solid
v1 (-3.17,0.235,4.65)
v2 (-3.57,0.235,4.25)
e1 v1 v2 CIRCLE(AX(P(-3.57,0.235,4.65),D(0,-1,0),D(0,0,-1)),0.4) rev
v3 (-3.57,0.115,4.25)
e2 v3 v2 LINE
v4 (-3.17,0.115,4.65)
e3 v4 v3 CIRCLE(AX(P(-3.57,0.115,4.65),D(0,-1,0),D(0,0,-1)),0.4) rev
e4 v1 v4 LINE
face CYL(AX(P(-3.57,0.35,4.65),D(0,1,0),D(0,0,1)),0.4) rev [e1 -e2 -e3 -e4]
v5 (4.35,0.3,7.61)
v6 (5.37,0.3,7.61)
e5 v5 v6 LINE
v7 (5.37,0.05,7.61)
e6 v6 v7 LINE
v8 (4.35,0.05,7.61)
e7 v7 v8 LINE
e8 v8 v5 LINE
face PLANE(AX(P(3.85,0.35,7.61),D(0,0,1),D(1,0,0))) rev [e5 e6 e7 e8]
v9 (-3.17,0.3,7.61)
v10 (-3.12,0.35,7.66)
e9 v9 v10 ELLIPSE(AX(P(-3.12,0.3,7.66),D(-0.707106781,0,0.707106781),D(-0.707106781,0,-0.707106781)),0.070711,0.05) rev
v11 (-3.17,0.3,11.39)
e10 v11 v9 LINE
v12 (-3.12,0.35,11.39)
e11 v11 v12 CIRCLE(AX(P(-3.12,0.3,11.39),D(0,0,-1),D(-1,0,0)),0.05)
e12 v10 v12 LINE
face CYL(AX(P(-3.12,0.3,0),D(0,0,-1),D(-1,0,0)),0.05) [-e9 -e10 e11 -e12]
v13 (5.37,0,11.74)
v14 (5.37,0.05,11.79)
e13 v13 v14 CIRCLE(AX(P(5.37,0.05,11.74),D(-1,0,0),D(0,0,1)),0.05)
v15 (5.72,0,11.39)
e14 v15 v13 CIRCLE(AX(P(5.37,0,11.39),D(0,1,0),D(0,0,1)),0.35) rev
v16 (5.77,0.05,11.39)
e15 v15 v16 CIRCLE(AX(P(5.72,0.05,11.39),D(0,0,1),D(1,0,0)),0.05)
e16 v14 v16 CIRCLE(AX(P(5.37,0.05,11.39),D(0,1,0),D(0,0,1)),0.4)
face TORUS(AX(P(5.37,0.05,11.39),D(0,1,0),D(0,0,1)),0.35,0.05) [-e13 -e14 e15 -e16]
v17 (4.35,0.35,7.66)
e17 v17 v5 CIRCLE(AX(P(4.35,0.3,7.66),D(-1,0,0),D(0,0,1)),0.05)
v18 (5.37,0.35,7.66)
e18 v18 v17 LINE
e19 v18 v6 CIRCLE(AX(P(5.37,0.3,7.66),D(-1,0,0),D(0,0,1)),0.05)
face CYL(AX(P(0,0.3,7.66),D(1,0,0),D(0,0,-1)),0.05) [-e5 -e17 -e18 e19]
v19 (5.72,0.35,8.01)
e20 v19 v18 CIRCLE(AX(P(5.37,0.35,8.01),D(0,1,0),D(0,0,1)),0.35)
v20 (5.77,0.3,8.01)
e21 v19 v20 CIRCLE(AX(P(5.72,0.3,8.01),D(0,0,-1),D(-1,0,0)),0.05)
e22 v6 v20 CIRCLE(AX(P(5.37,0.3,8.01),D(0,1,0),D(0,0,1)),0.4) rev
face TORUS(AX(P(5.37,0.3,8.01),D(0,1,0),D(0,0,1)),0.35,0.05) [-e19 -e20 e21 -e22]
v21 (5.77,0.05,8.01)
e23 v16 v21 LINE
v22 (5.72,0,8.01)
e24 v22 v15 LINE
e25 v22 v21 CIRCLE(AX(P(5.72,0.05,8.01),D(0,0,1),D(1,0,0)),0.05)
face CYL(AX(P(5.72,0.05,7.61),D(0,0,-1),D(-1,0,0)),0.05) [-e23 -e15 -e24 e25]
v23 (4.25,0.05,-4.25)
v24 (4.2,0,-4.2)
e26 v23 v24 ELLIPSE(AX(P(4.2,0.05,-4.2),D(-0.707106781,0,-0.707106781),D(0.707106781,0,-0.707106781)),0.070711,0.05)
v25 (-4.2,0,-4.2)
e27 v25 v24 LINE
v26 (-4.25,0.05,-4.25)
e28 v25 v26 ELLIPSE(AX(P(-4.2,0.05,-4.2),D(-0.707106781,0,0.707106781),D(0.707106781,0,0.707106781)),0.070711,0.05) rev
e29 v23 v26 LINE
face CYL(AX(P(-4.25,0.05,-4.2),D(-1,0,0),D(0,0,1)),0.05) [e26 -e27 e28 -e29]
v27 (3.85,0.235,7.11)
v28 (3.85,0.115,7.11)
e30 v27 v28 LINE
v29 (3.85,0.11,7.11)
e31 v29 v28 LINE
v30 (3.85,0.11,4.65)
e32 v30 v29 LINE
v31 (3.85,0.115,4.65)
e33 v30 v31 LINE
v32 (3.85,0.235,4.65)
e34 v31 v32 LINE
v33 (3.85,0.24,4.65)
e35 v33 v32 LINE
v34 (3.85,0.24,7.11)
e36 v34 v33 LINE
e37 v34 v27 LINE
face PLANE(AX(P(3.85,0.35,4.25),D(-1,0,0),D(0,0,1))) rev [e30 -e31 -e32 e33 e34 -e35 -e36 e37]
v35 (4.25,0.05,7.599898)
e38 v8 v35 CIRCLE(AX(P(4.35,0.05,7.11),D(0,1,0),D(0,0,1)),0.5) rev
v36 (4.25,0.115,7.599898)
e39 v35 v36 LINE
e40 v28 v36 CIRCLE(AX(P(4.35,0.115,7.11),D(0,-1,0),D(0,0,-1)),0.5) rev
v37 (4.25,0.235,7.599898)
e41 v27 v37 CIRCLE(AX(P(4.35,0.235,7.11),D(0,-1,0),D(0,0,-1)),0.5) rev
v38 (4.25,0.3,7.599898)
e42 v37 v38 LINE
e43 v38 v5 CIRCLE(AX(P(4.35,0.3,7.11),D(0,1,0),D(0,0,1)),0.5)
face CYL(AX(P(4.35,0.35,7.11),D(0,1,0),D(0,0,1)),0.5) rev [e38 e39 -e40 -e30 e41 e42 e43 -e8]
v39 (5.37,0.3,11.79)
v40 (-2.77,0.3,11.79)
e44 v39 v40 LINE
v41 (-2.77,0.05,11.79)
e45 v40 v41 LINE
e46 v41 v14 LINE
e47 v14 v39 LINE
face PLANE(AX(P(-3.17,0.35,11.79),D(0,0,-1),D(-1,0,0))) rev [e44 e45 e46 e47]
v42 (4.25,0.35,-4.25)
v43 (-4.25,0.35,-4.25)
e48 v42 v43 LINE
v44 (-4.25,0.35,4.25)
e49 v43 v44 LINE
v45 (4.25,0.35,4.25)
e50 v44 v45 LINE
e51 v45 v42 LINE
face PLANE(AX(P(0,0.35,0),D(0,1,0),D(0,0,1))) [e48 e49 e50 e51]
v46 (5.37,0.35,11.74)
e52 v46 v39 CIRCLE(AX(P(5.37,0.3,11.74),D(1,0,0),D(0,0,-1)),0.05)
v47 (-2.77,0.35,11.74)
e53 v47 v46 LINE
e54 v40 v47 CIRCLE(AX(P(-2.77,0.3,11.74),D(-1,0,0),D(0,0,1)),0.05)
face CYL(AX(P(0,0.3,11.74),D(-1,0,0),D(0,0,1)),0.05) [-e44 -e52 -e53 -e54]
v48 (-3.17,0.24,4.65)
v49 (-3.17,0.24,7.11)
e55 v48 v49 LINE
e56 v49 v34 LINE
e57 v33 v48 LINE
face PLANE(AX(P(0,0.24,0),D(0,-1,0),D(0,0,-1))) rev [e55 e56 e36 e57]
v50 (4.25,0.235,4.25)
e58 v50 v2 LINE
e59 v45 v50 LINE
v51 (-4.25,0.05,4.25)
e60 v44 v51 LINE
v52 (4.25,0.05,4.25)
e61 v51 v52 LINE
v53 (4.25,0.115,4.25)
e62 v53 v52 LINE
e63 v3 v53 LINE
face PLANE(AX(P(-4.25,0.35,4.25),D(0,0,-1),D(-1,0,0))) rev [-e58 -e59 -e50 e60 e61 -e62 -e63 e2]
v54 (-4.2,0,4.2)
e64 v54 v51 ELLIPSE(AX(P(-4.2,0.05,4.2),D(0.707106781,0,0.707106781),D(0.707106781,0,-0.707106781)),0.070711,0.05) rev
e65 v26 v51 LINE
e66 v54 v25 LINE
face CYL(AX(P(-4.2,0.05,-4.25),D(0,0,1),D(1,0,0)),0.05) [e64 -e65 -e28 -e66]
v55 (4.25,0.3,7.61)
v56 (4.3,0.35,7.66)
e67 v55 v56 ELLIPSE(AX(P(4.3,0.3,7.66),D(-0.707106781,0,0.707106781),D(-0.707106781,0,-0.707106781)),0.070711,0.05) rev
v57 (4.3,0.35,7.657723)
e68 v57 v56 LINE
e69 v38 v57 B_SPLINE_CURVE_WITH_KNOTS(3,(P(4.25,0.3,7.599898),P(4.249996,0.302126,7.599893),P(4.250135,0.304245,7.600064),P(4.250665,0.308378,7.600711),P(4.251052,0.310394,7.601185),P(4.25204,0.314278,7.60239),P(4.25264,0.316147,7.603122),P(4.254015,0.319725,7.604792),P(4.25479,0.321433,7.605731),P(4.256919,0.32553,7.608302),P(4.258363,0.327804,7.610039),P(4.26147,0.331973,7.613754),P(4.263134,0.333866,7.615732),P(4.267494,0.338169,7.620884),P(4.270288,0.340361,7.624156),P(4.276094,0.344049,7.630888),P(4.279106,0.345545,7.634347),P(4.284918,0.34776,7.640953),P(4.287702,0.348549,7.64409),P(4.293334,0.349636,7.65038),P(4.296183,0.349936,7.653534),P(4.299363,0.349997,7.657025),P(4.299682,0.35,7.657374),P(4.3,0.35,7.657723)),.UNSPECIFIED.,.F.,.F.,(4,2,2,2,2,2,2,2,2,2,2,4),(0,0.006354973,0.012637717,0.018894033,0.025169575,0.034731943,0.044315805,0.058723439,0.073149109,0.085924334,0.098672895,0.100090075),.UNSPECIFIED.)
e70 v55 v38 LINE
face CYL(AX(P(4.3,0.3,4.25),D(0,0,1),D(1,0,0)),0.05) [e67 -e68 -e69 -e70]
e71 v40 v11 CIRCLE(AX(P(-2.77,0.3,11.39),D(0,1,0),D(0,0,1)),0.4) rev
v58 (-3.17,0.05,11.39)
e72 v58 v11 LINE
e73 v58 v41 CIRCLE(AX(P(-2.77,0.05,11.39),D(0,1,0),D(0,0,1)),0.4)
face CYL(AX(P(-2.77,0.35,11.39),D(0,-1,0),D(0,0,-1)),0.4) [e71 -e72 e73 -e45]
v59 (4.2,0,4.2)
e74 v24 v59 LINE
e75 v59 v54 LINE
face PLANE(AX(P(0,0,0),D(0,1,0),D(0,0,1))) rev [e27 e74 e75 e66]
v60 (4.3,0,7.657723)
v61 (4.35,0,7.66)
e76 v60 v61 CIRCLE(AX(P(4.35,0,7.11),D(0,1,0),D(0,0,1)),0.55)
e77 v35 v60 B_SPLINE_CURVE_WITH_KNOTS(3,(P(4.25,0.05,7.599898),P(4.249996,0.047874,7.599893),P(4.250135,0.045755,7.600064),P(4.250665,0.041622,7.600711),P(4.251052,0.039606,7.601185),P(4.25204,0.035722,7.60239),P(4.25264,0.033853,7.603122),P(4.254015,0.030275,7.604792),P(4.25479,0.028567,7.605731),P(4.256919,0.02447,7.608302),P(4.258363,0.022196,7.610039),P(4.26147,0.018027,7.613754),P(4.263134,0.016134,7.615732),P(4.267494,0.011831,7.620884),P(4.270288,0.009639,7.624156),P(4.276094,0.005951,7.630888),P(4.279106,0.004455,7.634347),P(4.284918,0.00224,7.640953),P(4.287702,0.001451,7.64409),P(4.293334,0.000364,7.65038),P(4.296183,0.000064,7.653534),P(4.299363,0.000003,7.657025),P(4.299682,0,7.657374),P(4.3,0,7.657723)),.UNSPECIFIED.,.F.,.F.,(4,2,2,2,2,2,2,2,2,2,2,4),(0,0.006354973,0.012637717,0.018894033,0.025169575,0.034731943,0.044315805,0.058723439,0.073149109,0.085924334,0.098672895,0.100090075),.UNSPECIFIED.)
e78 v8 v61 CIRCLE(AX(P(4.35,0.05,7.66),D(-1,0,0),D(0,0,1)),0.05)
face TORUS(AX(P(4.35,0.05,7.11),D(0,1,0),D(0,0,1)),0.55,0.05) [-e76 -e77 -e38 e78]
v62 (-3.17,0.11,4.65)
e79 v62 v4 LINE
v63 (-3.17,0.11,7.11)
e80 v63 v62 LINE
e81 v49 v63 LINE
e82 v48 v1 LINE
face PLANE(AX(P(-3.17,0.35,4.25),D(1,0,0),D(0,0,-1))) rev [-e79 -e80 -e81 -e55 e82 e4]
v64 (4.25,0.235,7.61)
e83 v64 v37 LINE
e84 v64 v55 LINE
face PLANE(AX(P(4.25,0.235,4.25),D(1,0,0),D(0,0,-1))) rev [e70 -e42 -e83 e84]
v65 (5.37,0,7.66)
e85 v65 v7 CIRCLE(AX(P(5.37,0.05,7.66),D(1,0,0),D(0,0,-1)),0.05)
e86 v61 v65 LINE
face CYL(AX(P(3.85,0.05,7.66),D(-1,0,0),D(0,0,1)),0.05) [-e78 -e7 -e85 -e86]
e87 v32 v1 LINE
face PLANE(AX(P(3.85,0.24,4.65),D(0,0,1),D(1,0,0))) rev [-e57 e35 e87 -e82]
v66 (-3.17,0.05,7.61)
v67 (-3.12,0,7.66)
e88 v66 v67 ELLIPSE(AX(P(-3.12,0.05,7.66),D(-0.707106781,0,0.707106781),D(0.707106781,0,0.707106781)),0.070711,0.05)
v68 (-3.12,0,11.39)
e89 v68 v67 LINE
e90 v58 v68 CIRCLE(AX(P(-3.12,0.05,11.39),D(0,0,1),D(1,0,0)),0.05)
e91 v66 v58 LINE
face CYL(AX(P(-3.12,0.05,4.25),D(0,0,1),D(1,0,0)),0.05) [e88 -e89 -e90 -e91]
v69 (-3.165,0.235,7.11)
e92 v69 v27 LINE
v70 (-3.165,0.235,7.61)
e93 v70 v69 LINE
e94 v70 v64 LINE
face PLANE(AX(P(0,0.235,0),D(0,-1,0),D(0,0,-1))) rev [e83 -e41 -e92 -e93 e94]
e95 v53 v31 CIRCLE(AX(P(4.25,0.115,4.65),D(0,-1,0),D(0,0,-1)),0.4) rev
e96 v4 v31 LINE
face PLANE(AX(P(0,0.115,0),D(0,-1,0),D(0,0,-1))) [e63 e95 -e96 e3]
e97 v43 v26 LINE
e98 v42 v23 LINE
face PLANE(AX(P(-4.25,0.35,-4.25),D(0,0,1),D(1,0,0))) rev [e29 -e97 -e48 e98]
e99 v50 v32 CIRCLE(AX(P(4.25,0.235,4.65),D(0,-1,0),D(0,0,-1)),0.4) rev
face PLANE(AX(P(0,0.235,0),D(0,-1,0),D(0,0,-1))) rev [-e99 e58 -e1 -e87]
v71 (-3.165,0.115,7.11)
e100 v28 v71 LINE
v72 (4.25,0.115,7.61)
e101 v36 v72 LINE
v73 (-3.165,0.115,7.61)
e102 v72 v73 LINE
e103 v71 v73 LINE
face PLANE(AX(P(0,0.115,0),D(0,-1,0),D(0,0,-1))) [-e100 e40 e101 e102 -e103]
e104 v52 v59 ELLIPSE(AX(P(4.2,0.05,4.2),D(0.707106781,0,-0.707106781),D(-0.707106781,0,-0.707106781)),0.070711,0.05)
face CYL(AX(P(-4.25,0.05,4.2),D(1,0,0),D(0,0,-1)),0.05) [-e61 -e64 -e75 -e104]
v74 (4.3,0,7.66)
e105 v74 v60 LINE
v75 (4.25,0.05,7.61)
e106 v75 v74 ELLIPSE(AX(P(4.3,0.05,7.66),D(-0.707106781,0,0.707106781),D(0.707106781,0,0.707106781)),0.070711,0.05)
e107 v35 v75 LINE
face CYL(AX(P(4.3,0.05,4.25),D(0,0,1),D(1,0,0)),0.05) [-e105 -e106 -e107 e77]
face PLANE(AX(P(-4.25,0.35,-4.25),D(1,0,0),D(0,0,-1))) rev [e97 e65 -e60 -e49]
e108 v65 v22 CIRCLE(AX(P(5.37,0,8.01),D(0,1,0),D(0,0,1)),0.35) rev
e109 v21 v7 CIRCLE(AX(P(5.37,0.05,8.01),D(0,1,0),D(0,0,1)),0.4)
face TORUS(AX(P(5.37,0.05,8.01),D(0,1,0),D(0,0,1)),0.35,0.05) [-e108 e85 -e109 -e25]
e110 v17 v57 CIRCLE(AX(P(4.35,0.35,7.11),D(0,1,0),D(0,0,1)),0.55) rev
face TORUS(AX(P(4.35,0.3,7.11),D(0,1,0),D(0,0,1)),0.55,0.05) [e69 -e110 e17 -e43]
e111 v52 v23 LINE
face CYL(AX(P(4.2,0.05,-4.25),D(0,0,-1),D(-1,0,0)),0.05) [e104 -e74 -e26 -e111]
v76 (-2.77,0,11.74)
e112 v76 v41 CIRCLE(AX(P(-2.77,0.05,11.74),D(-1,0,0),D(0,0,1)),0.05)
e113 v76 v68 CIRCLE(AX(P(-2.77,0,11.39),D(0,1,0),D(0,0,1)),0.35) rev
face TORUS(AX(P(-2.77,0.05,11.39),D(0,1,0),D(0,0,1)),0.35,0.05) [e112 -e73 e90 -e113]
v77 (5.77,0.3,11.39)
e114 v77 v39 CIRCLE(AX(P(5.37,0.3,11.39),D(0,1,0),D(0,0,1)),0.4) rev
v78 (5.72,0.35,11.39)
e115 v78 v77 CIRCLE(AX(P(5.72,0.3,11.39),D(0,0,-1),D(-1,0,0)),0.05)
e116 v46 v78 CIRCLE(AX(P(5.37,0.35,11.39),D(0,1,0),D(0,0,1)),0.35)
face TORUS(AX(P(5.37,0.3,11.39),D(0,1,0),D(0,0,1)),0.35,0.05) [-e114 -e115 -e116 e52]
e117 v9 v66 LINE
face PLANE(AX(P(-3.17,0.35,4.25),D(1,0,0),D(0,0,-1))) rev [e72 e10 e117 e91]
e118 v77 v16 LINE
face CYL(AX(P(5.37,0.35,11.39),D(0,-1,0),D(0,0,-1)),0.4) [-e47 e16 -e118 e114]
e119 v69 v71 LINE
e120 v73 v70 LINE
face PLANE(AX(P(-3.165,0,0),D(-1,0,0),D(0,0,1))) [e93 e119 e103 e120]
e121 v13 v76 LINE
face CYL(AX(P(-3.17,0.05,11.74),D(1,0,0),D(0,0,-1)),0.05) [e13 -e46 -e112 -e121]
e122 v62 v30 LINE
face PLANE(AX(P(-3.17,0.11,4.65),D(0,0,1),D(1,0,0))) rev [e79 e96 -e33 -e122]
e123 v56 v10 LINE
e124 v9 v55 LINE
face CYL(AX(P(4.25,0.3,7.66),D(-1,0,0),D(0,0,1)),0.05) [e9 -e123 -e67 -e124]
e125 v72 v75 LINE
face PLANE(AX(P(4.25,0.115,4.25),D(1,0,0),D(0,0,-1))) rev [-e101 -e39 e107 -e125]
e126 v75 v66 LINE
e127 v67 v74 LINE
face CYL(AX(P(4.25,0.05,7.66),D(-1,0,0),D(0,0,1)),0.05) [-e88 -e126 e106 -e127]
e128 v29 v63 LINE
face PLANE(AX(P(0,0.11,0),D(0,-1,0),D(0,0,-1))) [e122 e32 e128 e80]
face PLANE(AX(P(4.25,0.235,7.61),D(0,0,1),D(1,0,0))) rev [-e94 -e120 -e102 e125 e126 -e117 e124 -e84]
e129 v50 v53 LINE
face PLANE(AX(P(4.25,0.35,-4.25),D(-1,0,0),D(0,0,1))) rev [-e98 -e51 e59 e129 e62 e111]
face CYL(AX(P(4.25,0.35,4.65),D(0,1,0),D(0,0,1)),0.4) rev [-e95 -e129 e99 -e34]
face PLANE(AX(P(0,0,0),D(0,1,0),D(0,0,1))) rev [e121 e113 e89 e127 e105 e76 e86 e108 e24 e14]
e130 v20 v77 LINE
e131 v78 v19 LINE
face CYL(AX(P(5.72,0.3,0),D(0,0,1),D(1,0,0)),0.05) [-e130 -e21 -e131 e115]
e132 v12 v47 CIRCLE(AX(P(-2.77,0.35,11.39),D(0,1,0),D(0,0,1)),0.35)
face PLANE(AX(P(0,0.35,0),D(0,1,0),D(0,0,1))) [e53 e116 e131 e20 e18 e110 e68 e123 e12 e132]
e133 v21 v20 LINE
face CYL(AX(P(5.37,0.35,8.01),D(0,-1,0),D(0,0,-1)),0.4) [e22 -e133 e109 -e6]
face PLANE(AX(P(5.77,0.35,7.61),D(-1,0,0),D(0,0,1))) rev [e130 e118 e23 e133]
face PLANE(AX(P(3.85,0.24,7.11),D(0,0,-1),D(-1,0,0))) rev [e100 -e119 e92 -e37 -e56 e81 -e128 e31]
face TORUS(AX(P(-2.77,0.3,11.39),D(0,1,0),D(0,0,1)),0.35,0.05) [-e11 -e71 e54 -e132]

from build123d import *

# Parameters (mm, degrees)
BOSS_EXTRUDE1_DEPTH = 0.35
FILLET1_R           = 0.4
FILLET2_R           = 0.5
SKETCH4_W           = 8.5
SKETCH4_H           = 3.36
CUT_EXTRUDE1_DEPTH  = 0.115
SKETCH5_W           = 8.5
SKETCH5_H           = 3.36
CUT_EXTRUDE2_DEPTH  = 0.115
FILLET3_R           = 0.05
SKETCH8_W           = 7.02
SKETCH8_H           = 2.46
BOSS_EXTRUDE2_DEPTH = 0.005
SKETCH9_W           = 7.02
SKETCH9_H           = 2.46
BOSS_EXTRUDE3_DEPTH = 0.005
SKETCH10_W          = 0.5
SKETCH10_H          = 0.12
CUT_EXTRUDE3_DEPTH  = 0.005


with BuildPart() as part:
    # Sketch3 → Boss-Extrude1 (new body)
    with BuildSketch(Plane(origin=(0, 0, 0), x_dir=(1, 0, 0), z_dir=(0, 1, 0))):
        Polygon((-4.25, -4.25), (-3.17, -4.25), (-3.17, -11.79), (5.77, -11.79), (5.77, -7.61), (3.85, -7.61), (3.85, -4.25), (4.25, -4.25), (4.25, 4.25), (-4.25, 4.25), align=None)
    extrude(amount=BOSS_EXTRUDE1_DEPTH)

    # Fillet1
    fillet1_edges = [part.edges().sort_by_distance(p)[0] for p in [
        (5.77, 0.175, 11.79),
        (-3.17, 0.175, 11.79),
        (-3.17, 0.175, 4.25),
        (3.85, 0.175, 4.25),
        (5.77, 0.175, 7.61),
    ]]
    fillet(fillet1_edges, radius=FILLET1_R - 0.0001)  # a hair under: the kernel refuses the full size

    # Fillet2
    fillet2_edges = [part.edges().sort_by_distance(p)[0] for p in [
        (3.85, 0.175, 7.61),
    ]]
    fillet(fillet2_edges, radius=FILLET2_R)

    # Sketch4 → Cut-Extrude1 (cut)
    with BuildSketch(Plane(origin=(0, 0.35, 0), x_dir=(1, 0, 0), z_dir=(0, 1, 0))):
        with Locations((0, -5.93)):
            Rectangle(SKETCH4_W, SKETCH4_H)
    extrude(amount=-CUT_EXTRUDE1_DEPTH, mode=Mode.SUBTRACT)

    # Sketch5 → Cut-Extrude2 (cut)
    with BuildSketch(Plane.XZ):
        with Locations((0, 5.93)):
            Rectangle(SKETCH5_W, SKETCH5_H)
    extrude(amount=-CUT_EXTRUDE2_DEPTH, mode=Mode.SUBTRACT)

    # Fillet3
    fillet3_edges = [part.edges().sort_by_distance(p)[0] for p in [
        (-3.17, 0, 9.50005),
        (0.54, 0, 7.61),
        (4.25, 0, 7.604948974),
        (0, 0, 4.25),
        (-4.25, 0, 0),
        (0, 0, -4.25),
        (4.25, 0, 0),
        (4.86005, 0, 7.61),
        (4.86005, 0.35, 7.61),
        (5.77, 0, 9.7),
        (1.3, 0, 11.79),
        (-3.052872002, 0, 11.672872002),
        (5.652872002, 0, 11.672872002),
        (5.652872002, 0, 7.727127998),
        (5.77, 0.35, 9.7),
        (1.3, 0.35, 11.79),
        (-3.052872002, 0.35, 11.672872002),
        (5.652872002, 0.35, 11.672872002),
        (5.652872002, 0.35, 7.727127998),
        (4.299745519, 0.35, 7.607468077),
        (-3.17, 0.35, 9.50005),
        (0.54, 0.35, 7.61),
        (4.25, 0.35, 7.604948974),
        (4.299745519, 0, 7.607468077),
    ]]
    fillet(fillet3_edges, radius=FILLET3_R)

    # Sketch8 → Boss-Extrude2 (add)
    with BuildSketch(Plane(origin=(0, 0.235, 0), x_dir=(1, 0, 0), z_dir=(0, 1, 0))):
        with Locations((0.34, -5.88)):
            Rectangle(SKETCH8_W, SKETCH8_H)
    extrude(amount=BOSS_EXTRUDE2_DEPTH)

    # Sketch9 → Boss-Extrude3 (add)
    with BuildSketch(Plane.XZ.offset(-0.115)):
        with Locations((0.34, 5.88)):
            Rectangle(SKETCH9_W, SKETCH9_H)
    extrude(amount=BOSS_EXTRUDE3_DEPTH)

    # Sketch10 → Cut-Extrude3 (cut)
    with BuildSketch(Plane.ZY.offset(3.17)):
        with Locations((7.36, 0.175)):
            Rectangle(SKETCH10_W, SKETCH10_H)
    extrude(amount=-CUT_EXTRUDE3_DEPTH, mode=Mode.SUBTRACT)


solid = part.part
